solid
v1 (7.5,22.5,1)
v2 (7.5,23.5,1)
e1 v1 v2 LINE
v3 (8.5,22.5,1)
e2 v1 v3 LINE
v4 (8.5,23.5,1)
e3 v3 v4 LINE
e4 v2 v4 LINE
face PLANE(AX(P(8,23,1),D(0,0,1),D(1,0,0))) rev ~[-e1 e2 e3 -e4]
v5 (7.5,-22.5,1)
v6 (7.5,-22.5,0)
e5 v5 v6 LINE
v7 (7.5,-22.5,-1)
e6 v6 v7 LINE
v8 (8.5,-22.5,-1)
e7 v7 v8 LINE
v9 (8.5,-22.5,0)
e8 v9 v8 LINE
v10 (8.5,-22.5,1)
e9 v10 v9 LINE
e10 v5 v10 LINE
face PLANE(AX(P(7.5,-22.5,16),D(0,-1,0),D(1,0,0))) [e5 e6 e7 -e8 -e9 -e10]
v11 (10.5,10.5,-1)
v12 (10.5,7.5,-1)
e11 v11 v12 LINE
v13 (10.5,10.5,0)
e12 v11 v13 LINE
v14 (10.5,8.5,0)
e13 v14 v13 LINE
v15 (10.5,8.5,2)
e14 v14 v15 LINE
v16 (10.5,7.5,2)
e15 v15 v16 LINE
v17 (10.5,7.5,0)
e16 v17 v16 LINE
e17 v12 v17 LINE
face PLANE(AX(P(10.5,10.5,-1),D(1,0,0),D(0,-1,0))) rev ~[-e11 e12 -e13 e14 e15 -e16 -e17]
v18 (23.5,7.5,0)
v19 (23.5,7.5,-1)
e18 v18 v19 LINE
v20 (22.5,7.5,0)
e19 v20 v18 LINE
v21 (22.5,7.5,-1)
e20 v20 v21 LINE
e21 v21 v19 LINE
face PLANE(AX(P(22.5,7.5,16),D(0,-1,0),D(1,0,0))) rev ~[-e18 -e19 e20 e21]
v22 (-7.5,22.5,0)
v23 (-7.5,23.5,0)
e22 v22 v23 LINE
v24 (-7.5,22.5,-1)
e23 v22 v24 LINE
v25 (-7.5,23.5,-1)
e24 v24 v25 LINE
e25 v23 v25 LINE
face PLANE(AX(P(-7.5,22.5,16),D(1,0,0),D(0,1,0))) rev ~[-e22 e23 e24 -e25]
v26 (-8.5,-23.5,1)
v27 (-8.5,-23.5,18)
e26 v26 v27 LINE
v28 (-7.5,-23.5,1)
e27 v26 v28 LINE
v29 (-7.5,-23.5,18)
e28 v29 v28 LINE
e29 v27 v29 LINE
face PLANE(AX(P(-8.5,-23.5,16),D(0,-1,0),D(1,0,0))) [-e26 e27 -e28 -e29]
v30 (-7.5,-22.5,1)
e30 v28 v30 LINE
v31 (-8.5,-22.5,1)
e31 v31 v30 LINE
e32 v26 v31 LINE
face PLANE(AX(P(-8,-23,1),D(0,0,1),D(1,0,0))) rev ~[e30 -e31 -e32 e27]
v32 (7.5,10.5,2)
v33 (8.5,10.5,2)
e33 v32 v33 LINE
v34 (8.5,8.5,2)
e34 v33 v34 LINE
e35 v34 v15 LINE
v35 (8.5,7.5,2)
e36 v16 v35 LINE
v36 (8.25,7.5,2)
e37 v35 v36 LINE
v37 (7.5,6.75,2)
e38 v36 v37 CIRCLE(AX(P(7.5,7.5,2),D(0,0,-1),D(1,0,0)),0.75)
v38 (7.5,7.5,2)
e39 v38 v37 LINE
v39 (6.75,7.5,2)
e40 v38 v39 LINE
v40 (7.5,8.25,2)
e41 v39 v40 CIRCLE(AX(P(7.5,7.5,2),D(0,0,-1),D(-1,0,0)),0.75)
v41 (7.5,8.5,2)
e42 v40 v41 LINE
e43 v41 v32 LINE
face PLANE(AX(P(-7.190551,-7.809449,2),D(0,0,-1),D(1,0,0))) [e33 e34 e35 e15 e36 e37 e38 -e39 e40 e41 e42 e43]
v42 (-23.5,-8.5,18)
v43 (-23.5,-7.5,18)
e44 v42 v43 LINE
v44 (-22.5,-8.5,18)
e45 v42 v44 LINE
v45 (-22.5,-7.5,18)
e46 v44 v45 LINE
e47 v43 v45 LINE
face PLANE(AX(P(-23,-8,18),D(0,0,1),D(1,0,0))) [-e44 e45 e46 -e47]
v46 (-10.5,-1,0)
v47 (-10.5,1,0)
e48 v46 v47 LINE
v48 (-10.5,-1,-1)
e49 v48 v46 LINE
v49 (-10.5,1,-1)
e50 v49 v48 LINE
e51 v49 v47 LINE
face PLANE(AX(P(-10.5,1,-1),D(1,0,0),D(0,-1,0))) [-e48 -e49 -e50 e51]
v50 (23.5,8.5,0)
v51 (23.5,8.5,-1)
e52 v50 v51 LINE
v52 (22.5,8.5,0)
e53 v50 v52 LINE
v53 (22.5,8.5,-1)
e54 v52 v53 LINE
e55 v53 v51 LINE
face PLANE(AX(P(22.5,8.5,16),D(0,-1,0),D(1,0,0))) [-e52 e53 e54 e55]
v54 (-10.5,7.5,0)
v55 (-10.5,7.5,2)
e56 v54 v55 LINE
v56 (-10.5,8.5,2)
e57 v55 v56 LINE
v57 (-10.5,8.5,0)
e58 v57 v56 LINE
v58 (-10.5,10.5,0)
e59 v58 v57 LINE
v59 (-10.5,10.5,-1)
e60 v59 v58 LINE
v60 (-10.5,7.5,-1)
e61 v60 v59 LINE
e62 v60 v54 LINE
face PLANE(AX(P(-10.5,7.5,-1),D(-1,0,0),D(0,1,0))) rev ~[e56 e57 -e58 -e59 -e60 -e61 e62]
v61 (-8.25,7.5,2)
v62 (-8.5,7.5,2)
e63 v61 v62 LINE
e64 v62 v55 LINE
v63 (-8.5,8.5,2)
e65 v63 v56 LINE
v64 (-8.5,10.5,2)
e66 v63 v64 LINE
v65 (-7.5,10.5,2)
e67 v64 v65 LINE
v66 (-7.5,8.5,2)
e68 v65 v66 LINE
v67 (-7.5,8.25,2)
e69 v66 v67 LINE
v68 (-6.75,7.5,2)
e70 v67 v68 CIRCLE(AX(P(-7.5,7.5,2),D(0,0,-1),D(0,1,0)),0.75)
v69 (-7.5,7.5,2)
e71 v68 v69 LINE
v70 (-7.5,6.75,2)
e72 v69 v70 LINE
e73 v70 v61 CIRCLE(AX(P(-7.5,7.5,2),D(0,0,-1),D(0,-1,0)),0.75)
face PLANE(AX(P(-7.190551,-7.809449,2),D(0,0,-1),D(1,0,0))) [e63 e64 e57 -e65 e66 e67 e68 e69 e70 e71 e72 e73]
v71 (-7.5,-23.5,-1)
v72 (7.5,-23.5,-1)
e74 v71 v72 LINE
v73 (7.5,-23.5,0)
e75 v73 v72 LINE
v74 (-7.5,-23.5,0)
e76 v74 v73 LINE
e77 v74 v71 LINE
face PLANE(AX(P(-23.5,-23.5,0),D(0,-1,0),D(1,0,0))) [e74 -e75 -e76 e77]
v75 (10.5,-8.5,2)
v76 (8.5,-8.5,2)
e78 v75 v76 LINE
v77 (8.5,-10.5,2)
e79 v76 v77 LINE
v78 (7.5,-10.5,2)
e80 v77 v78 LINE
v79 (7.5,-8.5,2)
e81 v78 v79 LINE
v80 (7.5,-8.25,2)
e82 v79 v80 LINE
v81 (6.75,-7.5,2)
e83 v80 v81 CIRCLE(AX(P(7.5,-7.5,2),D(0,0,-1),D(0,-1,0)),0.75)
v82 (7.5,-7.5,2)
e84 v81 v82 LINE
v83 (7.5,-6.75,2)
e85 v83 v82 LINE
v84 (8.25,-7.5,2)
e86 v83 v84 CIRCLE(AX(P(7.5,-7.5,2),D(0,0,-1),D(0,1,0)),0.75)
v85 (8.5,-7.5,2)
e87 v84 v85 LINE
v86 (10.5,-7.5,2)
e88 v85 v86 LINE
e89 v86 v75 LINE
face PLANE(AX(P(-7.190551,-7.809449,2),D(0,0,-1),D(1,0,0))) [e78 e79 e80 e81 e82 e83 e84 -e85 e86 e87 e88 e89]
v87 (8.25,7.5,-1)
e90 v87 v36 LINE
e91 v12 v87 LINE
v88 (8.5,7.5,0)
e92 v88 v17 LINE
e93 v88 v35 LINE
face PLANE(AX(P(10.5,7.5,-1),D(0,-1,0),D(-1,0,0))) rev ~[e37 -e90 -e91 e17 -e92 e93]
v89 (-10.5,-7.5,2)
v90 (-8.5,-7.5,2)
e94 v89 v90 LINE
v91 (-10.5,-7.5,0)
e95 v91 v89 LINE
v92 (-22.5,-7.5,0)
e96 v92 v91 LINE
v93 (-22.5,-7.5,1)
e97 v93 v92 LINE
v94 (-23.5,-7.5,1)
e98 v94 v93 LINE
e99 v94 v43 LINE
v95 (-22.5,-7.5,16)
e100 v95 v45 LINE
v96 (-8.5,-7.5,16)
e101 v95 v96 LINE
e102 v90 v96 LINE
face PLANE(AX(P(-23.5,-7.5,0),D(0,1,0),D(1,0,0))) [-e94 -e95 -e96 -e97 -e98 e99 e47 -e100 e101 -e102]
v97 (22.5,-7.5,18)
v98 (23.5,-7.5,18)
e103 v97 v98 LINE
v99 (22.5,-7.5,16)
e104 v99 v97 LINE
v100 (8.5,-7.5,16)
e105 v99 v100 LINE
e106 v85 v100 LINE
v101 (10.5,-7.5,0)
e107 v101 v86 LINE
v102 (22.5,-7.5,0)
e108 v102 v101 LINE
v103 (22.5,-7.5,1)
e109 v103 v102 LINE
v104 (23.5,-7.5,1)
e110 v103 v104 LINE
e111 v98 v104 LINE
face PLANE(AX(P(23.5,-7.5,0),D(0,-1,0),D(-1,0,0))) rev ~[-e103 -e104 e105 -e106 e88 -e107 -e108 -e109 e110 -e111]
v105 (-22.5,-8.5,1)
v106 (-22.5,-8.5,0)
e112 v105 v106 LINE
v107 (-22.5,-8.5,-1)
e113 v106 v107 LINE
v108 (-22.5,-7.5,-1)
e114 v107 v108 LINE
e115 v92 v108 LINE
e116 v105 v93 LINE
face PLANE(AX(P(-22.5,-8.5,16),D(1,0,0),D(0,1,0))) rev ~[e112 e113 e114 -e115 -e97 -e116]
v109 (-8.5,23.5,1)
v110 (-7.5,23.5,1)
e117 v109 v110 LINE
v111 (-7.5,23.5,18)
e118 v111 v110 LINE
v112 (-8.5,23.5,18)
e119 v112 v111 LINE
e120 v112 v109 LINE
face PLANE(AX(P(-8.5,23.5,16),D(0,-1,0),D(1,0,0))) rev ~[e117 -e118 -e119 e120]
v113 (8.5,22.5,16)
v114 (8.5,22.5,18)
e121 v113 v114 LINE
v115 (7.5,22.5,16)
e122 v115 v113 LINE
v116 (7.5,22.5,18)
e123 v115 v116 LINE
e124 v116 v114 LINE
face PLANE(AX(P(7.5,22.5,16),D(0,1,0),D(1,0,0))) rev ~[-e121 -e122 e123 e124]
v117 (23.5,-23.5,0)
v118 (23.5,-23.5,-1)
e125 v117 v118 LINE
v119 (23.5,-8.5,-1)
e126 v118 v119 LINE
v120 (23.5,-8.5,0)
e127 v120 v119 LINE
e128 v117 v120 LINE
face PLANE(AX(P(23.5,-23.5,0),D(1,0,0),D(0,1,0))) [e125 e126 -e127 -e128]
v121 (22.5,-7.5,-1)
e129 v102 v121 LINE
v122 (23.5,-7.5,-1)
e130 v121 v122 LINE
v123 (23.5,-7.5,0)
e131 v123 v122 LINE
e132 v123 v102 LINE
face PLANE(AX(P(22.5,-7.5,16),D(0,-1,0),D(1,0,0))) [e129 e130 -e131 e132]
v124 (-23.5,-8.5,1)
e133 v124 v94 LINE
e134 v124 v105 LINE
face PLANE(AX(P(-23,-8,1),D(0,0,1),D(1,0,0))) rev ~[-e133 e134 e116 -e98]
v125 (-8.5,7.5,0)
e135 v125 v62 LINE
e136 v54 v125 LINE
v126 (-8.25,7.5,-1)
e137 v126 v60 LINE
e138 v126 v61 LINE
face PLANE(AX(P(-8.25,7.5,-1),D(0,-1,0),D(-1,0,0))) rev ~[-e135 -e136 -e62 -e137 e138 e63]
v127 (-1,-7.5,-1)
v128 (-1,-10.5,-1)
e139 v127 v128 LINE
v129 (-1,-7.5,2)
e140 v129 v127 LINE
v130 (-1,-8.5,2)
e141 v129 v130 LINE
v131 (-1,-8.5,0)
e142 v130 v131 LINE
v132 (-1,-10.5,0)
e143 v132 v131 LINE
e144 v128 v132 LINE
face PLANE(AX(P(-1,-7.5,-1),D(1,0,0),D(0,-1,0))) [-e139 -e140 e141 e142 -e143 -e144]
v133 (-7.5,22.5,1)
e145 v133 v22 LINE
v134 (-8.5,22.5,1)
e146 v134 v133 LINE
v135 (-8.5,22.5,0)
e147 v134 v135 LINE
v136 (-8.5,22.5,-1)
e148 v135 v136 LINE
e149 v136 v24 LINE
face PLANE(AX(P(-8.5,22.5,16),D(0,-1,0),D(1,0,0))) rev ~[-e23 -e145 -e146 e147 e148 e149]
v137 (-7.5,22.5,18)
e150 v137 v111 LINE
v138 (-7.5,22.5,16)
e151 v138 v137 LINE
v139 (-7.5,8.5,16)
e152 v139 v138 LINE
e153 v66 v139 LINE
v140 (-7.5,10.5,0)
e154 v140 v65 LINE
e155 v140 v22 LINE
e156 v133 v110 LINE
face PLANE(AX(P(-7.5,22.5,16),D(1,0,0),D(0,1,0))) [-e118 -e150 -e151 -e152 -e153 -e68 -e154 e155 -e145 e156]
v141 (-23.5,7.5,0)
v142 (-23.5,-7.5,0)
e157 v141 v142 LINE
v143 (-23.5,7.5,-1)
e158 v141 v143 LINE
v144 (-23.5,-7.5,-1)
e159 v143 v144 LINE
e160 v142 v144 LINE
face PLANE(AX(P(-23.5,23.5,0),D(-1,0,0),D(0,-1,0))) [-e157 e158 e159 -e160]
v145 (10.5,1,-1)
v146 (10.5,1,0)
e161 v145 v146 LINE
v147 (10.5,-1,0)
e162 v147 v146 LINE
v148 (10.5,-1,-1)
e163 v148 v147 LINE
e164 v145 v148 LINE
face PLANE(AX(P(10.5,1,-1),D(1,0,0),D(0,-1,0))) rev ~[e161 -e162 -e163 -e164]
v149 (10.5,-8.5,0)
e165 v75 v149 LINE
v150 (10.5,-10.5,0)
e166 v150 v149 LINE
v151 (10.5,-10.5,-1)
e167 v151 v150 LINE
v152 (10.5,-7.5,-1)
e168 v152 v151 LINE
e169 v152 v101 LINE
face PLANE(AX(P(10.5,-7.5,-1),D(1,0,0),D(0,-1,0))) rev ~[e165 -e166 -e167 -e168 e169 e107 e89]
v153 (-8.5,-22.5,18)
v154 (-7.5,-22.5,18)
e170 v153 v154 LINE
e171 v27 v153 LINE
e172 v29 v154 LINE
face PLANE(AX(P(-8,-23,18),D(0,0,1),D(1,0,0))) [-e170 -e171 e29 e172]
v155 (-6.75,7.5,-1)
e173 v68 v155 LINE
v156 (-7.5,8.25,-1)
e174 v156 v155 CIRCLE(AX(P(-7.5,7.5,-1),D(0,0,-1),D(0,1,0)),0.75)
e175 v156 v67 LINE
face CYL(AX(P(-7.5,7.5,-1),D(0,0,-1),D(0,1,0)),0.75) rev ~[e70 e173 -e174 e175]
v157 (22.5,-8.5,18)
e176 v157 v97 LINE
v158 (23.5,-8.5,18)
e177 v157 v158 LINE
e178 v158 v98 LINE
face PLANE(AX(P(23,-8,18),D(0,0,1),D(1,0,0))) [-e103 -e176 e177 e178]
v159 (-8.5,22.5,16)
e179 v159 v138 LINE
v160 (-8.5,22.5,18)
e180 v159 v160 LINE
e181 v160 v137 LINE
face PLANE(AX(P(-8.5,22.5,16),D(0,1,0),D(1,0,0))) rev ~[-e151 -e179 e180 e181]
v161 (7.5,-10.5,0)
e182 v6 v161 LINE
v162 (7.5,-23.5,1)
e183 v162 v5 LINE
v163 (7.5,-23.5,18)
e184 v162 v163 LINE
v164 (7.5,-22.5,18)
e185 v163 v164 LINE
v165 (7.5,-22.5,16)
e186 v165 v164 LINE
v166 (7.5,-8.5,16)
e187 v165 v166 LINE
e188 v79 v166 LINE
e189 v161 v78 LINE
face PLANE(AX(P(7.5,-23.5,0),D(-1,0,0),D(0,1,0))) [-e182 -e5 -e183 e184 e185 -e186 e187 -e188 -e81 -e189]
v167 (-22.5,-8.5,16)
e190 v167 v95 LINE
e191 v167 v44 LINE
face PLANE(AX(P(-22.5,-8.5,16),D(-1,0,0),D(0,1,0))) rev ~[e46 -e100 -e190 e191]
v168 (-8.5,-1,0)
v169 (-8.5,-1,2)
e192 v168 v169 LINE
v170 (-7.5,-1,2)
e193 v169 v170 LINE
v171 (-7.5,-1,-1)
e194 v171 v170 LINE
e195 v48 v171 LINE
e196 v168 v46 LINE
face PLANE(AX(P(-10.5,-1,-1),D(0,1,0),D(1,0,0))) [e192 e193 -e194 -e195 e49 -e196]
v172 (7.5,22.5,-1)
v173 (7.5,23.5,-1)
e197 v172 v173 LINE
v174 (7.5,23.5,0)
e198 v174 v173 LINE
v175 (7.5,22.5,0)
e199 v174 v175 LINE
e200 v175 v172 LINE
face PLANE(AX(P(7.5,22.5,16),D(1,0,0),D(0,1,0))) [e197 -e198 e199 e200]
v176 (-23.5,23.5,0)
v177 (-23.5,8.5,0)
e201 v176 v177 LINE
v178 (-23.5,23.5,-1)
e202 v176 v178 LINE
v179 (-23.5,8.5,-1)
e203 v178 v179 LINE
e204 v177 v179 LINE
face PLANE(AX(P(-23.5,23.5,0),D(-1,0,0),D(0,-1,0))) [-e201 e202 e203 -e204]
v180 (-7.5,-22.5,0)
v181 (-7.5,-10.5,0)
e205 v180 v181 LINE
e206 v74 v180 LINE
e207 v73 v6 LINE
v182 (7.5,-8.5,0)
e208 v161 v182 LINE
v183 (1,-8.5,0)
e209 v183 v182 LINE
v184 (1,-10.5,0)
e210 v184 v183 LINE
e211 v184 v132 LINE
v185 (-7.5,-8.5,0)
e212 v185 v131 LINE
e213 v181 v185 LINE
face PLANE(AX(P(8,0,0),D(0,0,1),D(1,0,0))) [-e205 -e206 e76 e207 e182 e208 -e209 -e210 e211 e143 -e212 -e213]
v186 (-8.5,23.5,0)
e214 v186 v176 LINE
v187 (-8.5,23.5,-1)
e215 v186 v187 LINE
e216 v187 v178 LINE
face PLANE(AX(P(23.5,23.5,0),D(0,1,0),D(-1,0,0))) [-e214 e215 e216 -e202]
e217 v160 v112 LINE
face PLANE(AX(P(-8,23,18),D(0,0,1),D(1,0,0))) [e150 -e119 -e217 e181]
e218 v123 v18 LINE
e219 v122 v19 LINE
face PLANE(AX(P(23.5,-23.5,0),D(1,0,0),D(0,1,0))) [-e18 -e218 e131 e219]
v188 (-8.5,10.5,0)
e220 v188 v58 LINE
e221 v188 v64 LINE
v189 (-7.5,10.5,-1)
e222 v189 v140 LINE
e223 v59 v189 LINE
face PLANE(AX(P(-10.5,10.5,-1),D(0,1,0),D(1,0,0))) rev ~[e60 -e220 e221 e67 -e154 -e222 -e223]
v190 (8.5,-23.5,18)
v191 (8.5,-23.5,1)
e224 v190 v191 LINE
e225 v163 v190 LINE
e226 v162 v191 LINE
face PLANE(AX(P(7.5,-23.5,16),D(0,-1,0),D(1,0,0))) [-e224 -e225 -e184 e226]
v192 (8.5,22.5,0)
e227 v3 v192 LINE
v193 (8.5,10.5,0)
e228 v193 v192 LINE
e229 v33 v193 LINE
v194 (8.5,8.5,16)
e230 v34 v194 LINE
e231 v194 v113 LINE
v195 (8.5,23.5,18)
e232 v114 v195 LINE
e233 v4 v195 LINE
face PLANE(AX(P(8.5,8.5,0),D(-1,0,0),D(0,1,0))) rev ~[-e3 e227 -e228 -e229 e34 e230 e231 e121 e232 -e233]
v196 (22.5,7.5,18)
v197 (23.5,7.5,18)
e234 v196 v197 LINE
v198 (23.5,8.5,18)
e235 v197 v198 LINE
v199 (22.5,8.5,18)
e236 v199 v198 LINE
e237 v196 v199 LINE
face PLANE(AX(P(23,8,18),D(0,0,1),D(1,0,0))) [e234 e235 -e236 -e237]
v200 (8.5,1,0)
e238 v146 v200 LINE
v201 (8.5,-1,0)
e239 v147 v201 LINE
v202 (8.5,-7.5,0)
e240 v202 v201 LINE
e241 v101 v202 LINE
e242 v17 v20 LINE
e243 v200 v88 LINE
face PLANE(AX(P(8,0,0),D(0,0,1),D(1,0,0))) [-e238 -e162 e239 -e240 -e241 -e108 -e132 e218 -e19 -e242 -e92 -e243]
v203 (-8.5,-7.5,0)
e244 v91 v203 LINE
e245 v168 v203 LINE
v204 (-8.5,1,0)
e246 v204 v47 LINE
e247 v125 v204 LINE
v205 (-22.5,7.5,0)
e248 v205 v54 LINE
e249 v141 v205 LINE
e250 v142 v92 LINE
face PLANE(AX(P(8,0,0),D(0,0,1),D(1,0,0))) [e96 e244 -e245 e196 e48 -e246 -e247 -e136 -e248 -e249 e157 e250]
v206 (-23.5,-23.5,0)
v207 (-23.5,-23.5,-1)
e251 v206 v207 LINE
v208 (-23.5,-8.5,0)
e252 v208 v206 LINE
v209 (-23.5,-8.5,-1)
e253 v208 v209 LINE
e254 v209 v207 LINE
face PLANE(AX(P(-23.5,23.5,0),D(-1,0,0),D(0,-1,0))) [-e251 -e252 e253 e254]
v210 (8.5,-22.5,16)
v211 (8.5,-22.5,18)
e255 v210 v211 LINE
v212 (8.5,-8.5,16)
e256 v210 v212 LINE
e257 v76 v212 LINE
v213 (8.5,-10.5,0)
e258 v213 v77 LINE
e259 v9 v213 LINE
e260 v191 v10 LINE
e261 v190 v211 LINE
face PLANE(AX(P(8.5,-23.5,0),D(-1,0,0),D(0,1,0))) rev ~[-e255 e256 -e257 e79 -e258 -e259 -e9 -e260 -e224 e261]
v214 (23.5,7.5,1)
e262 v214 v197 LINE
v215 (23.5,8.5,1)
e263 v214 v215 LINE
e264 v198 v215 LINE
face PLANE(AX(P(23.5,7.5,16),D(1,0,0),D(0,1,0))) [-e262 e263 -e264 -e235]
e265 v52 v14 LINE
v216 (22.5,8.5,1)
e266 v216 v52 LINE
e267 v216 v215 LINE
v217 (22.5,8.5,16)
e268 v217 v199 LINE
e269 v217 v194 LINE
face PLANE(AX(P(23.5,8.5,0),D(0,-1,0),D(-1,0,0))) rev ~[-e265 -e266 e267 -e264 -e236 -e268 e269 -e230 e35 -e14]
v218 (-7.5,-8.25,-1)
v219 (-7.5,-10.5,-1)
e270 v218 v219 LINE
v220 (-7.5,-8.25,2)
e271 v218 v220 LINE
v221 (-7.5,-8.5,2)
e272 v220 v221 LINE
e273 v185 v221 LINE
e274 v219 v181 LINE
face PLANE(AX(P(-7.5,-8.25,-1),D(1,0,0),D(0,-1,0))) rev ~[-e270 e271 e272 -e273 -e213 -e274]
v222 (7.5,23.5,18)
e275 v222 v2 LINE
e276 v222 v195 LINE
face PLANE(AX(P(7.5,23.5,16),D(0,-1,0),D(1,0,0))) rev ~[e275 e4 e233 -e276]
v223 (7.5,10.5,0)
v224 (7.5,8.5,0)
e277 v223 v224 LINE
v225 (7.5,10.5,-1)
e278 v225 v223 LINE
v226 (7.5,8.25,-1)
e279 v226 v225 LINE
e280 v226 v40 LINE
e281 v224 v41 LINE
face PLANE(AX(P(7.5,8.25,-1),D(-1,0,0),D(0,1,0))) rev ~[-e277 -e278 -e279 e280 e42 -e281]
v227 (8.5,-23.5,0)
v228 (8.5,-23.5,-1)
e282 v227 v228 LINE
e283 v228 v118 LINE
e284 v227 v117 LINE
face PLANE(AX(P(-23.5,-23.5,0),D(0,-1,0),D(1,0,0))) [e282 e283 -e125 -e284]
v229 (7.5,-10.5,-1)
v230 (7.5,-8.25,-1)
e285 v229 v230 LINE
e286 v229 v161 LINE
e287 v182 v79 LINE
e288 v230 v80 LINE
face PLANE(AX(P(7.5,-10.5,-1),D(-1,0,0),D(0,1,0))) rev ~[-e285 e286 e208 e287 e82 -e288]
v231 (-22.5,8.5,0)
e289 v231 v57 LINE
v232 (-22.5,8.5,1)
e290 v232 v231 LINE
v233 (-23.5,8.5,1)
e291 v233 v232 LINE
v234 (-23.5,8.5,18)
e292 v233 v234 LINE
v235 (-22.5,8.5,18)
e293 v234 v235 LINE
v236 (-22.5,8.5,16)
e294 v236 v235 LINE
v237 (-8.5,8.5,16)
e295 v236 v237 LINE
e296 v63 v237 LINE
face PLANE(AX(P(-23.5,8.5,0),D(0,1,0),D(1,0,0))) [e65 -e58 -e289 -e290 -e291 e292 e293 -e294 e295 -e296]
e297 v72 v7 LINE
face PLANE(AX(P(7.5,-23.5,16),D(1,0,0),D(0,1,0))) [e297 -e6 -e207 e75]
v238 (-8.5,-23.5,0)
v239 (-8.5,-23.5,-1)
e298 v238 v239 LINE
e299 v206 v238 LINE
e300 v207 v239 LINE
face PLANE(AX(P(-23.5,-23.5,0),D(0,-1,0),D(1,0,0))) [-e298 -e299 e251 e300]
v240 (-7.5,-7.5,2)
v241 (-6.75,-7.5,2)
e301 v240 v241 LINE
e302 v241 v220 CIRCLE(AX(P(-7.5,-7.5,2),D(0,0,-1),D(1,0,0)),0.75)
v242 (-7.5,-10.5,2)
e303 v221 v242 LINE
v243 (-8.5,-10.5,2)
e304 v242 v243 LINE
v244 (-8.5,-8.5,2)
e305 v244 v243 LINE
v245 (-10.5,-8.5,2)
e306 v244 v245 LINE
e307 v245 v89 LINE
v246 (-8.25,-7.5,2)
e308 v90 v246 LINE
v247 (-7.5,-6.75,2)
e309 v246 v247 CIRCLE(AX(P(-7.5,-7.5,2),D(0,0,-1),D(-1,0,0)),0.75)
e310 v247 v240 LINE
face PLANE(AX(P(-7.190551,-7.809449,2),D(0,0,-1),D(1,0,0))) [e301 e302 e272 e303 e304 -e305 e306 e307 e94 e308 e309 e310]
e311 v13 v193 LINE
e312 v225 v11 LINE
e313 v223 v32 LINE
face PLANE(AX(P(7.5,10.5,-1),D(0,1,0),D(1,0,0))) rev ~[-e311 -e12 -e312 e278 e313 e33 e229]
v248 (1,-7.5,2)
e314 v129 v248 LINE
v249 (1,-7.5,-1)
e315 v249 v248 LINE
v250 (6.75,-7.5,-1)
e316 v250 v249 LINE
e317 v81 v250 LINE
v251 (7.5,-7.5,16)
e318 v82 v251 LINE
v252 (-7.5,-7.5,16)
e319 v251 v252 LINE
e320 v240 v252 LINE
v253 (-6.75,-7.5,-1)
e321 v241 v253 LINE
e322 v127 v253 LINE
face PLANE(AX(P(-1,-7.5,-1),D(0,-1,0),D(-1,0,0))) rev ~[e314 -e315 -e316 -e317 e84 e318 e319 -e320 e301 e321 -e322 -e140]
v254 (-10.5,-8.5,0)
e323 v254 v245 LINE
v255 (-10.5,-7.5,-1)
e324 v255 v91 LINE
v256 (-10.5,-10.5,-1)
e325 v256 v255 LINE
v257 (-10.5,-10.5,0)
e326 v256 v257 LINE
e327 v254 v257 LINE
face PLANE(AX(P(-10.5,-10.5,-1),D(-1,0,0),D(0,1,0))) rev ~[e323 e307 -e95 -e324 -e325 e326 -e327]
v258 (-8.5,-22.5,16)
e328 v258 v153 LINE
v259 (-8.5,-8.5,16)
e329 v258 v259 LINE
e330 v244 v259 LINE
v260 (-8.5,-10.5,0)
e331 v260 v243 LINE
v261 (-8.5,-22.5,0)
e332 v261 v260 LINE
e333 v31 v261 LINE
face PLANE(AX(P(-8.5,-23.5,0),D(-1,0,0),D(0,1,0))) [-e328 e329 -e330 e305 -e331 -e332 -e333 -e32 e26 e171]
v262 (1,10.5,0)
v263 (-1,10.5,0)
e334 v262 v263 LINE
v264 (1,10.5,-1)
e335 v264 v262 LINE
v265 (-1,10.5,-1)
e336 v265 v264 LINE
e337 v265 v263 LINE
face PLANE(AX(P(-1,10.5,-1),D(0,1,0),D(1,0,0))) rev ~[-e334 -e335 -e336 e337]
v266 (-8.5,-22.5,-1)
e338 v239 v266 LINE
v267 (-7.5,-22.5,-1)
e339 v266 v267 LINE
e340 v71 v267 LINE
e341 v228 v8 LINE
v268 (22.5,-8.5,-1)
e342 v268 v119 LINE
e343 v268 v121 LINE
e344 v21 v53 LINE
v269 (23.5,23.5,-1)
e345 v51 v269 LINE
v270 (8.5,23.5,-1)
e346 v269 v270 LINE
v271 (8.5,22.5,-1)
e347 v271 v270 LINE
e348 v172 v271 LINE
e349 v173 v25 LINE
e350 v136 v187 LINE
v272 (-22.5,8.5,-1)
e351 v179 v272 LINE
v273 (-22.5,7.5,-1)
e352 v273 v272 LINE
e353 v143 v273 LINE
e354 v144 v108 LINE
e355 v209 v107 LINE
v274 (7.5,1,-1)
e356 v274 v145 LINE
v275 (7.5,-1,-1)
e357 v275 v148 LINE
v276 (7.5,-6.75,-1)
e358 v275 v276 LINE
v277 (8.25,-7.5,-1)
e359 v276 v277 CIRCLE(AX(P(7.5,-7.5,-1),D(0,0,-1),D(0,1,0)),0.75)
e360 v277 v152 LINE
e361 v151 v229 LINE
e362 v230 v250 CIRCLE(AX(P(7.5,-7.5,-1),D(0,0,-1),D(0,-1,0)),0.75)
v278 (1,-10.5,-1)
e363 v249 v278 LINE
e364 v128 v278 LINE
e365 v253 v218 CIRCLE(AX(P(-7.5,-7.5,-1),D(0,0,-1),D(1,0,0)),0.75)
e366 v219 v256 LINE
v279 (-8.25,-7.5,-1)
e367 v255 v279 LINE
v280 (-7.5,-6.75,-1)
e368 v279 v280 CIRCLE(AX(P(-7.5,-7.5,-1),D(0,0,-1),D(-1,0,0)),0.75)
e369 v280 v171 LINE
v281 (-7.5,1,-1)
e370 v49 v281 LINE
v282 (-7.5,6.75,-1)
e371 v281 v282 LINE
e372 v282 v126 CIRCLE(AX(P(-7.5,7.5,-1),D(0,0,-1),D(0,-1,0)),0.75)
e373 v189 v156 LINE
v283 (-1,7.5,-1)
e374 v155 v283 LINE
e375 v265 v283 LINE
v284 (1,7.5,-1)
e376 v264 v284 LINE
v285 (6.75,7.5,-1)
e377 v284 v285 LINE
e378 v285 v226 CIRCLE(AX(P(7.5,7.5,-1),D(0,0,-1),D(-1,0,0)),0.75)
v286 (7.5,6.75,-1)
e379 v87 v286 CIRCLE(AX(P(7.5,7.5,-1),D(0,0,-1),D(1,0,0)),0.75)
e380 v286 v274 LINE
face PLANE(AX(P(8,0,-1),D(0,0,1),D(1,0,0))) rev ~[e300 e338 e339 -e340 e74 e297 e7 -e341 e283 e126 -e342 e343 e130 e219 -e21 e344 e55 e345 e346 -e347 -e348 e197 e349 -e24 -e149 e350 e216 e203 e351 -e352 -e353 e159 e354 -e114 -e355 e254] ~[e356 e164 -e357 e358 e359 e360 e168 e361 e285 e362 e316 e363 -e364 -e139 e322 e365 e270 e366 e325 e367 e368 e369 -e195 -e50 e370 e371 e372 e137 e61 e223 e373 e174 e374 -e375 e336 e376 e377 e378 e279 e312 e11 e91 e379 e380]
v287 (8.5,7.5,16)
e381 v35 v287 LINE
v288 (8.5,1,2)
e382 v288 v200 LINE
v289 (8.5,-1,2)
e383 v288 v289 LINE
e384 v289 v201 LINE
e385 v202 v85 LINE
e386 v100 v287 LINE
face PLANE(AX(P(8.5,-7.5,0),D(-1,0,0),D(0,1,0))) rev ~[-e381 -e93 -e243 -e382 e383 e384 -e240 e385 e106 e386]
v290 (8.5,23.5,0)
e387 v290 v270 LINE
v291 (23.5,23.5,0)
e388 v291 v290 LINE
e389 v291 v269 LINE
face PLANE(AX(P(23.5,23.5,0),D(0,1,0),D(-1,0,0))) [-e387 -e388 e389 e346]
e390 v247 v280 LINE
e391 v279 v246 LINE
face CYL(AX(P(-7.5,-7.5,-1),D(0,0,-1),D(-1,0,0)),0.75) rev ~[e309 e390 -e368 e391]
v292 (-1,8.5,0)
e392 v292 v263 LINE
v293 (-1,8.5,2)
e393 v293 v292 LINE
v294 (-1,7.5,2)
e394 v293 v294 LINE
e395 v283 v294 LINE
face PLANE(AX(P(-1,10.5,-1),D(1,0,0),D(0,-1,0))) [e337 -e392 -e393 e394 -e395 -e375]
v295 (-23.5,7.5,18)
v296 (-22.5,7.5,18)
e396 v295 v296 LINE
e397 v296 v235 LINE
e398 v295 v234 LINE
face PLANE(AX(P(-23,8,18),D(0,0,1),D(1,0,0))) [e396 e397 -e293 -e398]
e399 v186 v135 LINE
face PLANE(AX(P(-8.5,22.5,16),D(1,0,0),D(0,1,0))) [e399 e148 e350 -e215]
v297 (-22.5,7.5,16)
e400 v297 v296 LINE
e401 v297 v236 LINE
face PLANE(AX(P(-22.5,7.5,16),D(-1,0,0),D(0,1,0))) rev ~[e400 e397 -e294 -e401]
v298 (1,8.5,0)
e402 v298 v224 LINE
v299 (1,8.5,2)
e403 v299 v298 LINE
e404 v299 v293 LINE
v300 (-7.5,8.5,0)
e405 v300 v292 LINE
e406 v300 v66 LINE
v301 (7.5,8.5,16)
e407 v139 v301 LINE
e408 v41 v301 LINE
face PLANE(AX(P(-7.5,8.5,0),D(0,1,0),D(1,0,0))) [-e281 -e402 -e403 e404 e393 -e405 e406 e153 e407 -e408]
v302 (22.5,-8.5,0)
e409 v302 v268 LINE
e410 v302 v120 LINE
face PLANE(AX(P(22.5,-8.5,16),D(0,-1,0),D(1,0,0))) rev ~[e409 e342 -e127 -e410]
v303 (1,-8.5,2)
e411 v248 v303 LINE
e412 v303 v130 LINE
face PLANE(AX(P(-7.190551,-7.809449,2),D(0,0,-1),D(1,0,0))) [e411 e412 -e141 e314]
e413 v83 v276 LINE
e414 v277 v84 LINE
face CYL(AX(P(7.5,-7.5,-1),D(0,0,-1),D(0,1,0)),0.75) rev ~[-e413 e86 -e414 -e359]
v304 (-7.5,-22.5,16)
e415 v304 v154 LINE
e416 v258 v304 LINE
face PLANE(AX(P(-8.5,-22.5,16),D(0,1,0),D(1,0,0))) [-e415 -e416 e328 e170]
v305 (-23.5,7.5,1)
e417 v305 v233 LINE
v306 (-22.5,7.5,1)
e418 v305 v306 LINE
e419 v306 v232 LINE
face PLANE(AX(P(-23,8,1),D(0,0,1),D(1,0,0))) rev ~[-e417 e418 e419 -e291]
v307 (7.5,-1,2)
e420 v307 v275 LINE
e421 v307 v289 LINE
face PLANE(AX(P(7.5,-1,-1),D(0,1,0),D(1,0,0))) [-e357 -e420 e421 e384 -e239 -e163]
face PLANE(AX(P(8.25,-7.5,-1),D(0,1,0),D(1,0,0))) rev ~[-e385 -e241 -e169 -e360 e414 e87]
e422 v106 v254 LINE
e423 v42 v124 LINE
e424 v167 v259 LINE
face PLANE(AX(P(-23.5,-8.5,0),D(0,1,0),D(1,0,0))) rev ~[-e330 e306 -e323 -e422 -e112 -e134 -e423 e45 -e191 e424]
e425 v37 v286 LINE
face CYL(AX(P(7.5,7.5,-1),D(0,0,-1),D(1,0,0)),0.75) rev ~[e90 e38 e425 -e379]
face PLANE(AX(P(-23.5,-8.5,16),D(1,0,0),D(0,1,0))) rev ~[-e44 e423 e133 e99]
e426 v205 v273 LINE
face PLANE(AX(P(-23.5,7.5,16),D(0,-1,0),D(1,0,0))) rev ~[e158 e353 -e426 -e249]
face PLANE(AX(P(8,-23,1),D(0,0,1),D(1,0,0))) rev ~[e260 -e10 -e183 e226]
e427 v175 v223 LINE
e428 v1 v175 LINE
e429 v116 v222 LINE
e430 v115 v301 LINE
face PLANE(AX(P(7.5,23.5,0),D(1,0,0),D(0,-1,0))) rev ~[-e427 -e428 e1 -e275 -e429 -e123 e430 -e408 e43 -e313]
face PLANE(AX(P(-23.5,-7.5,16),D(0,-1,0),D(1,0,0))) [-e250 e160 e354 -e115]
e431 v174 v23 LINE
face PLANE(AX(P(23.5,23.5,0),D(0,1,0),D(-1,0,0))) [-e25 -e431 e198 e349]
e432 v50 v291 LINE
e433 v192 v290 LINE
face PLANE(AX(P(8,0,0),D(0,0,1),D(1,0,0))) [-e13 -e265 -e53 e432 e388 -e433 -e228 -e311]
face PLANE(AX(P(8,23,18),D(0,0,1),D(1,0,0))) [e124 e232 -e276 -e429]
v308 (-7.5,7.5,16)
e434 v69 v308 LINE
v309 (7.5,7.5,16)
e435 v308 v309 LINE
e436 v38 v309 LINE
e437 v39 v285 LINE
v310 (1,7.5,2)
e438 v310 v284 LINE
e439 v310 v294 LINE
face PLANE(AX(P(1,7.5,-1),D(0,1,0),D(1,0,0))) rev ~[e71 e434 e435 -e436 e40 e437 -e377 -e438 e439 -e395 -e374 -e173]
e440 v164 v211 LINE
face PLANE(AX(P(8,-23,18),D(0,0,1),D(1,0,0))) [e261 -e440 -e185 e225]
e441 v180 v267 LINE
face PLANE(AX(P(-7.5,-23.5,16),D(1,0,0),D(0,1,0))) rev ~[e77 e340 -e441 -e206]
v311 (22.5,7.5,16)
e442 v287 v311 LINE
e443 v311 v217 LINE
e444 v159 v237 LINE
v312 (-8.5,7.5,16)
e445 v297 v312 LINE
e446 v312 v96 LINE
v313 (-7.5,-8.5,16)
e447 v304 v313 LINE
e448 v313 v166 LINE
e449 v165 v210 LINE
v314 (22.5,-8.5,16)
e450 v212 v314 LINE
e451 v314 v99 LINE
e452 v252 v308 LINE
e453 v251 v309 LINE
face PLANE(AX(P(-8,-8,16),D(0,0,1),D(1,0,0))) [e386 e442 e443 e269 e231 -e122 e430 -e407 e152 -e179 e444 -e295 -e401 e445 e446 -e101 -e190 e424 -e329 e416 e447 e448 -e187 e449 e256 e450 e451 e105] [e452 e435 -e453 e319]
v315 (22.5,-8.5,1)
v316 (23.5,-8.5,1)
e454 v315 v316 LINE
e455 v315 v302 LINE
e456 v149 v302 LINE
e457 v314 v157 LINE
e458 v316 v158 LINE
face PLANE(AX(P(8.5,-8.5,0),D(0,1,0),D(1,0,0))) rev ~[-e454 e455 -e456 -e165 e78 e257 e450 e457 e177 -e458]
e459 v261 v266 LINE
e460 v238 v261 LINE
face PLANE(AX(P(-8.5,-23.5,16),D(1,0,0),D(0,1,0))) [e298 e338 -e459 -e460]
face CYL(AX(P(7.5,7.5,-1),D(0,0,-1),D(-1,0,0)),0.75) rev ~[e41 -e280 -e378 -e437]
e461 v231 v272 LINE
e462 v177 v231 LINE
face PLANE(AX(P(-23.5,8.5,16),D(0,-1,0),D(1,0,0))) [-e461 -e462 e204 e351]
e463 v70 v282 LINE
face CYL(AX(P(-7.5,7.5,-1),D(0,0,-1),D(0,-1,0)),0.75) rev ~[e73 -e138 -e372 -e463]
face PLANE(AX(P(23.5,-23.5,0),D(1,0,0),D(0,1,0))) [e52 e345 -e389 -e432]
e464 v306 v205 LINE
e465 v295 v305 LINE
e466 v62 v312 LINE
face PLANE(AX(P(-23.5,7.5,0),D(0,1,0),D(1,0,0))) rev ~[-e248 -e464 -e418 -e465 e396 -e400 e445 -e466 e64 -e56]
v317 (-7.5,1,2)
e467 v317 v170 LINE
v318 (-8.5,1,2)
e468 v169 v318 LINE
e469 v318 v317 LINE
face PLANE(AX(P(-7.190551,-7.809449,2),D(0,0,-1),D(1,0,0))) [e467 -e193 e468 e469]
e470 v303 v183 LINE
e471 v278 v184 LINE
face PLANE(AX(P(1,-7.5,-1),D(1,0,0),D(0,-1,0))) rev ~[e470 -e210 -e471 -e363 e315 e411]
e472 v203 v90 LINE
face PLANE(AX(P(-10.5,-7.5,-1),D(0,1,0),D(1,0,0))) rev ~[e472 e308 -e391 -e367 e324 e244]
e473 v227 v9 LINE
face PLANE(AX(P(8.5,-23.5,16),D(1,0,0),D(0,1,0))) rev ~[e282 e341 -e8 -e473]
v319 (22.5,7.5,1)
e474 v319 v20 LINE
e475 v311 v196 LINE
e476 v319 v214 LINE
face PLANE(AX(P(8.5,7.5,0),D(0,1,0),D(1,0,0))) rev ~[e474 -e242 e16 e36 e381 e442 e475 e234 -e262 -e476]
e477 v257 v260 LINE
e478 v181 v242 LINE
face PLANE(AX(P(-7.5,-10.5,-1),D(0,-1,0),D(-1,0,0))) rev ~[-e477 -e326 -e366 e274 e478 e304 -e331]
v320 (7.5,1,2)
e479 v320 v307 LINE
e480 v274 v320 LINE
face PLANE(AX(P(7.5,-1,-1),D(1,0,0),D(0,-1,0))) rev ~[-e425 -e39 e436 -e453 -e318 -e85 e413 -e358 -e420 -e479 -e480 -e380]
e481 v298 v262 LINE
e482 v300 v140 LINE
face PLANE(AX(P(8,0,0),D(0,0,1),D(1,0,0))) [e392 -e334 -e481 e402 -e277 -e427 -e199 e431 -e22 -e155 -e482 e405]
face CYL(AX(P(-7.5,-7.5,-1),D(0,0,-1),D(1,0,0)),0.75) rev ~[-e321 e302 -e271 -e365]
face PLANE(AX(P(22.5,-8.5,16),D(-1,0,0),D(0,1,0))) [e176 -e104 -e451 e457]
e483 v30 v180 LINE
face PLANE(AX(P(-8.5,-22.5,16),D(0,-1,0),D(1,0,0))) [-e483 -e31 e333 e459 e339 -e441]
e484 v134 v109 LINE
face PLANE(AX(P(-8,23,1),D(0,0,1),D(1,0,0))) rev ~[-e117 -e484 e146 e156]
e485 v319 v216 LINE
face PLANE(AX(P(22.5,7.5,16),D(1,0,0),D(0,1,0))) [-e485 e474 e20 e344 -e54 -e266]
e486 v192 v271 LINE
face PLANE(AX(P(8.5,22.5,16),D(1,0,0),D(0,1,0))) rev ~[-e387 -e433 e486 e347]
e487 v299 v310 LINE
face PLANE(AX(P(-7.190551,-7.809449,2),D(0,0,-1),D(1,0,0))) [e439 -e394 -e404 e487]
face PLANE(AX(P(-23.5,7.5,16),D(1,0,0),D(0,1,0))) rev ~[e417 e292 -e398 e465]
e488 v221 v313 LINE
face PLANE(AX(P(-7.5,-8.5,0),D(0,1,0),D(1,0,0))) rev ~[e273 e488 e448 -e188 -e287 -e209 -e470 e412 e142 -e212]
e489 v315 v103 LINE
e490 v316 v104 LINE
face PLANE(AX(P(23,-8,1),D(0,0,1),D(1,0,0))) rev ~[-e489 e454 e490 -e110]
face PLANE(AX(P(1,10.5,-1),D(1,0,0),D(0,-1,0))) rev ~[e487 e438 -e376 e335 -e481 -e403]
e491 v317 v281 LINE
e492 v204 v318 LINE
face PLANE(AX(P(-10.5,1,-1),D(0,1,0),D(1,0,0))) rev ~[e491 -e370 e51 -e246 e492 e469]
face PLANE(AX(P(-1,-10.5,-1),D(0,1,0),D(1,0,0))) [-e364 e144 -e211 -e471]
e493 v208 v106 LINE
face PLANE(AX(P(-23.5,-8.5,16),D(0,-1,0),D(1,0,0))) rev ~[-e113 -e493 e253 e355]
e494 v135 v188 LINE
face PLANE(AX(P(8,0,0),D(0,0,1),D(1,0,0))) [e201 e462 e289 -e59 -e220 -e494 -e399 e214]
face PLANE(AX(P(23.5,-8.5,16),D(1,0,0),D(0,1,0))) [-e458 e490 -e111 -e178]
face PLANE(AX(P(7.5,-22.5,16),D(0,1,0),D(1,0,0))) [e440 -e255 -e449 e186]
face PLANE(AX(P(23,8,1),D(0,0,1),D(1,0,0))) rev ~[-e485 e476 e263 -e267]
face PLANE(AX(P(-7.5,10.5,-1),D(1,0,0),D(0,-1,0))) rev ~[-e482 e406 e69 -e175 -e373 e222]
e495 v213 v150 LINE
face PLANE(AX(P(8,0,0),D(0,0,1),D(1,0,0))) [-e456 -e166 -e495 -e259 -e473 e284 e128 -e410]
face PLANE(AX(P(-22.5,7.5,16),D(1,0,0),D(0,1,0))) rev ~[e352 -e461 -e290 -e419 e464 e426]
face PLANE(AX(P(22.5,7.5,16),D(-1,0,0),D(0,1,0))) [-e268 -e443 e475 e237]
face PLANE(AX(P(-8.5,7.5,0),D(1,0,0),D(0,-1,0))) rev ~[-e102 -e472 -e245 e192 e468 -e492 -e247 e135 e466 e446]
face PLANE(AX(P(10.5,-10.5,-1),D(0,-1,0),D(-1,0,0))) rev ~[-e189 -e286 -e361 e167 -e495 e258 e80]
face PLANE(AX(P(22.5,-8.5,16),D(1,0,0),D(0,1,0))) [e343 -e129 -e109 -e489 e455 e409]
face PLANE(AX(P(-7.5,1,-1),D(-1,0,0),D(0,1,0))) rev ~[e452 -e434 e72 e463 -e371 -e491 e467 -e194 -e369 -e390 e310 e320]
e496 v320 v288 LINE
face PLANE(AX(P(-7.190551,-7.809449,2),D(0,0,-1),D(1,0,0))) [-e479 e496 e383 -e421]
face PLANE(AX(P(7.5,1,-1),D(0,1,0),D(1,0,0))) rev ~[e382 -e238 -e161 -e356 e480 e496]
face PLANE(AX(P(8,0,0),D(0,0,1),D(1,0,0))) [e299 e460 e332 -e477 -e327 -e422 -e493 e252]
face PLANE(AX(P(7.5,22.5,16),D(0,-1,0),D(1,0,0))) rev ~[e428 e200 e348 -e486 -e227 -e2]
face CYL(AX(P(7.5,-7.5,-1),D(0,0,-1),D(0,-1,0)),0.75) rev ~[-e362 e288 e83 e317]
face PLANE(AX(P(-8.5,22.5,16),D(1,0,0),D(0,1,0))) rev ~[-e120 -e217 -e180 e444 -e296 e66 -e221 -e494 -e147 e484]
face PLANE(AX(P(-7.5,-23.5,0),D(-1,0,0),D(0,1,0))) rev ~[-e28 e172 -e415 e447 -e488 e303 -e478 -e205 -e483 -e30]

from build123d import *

# Parameters (mm, degrees)
F0_W          = 1
F0_H          = 15
F0_W_2        = 15
F0_H_2        = 1
F1_DEPTH      = 1
F2_DEPTH      = 16
F3_W          = 2
F3_H          = 3
F3_W_2        = 3
F3_H_2        = 2
F4_DEPTH      = 3
F5_W          = 1
F5_H          = 1
F6_DEPTH      = 25
F7_DEPTH      = 2
F7_DEPTH_BACK = 15


with BuildPart() as f1:
    # F0 (on Top) → F1 (new body)
    with BuildSketch(Plane.XY):
        with Locations((8, 0)):
            Rectangle(F0_W, F0_H)
        with Locations((-16, -8)):
            Rectangle(F0_W_2, F0_H_2)
        with Locations((-16, 0)):
            Rectangle(F0_W_2, F0_H)
        with Locations((8, -16)):
            Rectangle(F0_W, F0_H)
        with Locations((0, -16)):
            Rectangle(F0_W_2, F0_H)
        with Locations((-8, -16)):
            Rectangle(F0_W, F0_H)
        with Locations((16, -16)):
            Rectangle(F0_W_2, F0_H)
        with Locations((-16, -16)):
            Rectangle(F0_W_2, F0_H)
        with Locations((16, 0)):
            Rectangle(F0_W_2, F0_H)
        with Locations((16, -8)):
            Rectangle(F0_W_2, F0_H_2)
        with Locations((0, -8)):
            Rectangle(F0_W_2, F0_H_2)
        with Locations((-8, 0)):
            Rectangle(F0_W, F0_H)
        Rectangle(F0_W_2, F0_H)
        with Locations((8, -8)):
            Rectangle(F0_W, F0_H_2)
        with Locations((-8, -8)):
            Rectangle(F0_W, F0_H_2)
        with Locations((-8, 8)):
            Rectangle(F0_W, F0_H_2)
        with Locations((-16, 8)):
            Rectangle(F0_W_2, F0_H_2)
        with Locations((8, 16)):
            Rectangle(F0_W, F0_H)
        with Locations((0, 16)):
            Rectangle(F0_W_2, F0_H)
        with Locations((-8, 16)):
            Rectangle(F0_W, F0_H)
        with Locations((16, 16)):
            Rectangle(F0_W_2, F0_H)
        with Locations((16, 8)):
            Rectangle(F0_W_2, F0_H_2)
        with Locations((-16, 16)):
            Rectangle(F0_W_2, F0_H)
        with Locations((8, 8)):
            Rectangle(F0_W, F0_H_2)
        with Locations((0, 8)):
            Rectangle(F0_W_2, F0_H_2)
    extrude(amount=-F1_DEPTH)

    # F0 (on Top) → F2 (join)
    with BuildSketch(Plane.XY):
        with Locations((-8, -8)):
            Rectangle(F0_W, F0_H_2)
        with Locations((8, -8)):
            Rectangle(F0_W, F0_H_2)
        with Locations((-8, 8)):
            Rectangle(F0_W, F0_H_2)
        with Locations((8, 8)):
            Rectangle(F0_W, F0_H_2)
        with Locations((16, 8)):
            Rectangle(F0_W_2, F0_H_2)
        with Locations((8, 16)):
            Rectangle(F0_W, F0_H)
        with Locations((-8, 16)):
            Rectangle(F0_W, F0_H)
        with Locations((0, 8)):
            Rectangle(F0_W_2, F0_H_2)
        with Locations((-16, 8)):
            Rectangle(F0_W_2, F0_H_2)
        with Locations((-8, 0)):
            Rectangle(F0_W, F0_H)
        with Locations((-16, -8)):
            Rectangle(F0_W_2, F0_H_2)
        with Locations((0, -8)):
            Rectangle(F0_W_2, F0_H_2)
        with Locations((16, -8)):
            Rectangle(F0_W_2, F0_H_2)
        with Locations((8, -16)):
            Rectangle(F0_W, F0_H)
        with Locations((-8, -16)):
            Rectangle(F0_W, F0_H)
        with Locations((8, 0)):
            Rectangle(F0_W, F0_H)
    extrude(amount=F2_DEPTH)

    # F3 (on face) → F4 (cut)
    with BuildSketch(Plane(origin=(0, 0, -1), x_dir=(1, 0, 0), z_dir=(0, 0, -1))):
        with BuildLine():
            Line((-7.5, 8.25), (-7.5, 7.5))
            Line((-7.5, 7.5), (-6.75, 7.5))
            ThreePointArc((-6.75, 7.5), (-6.9696699141, 8.0303300859), (-7.5, 8.25))
        make_face()
        with BuildLine():
            Line((-6.75, 7.5), (-7.5, 7.5))
            Line((-7.5, 7.5), (-7.5, 6.75))
            ThreePointArc((-7.5, 6.75), (-6.9696699141, 6.9696699141), (-6.75, 7.5))
        make_face()
        with BuildLine():
            Line((-7.5, 6.75), (-7.5, 7.5))
            Line((-7.5, 7.5), (-8.25, 7.5))
            ThreePointArc((-8.25, 7.5), (-8.0303300859, 6.9696699141), (-7.5, 6.75))
        make_face()
        with BuildLine():
            Line((-8.25, 7.5), (-7.5, 7.5))
            Line((-7.5, 7.5), (-7.5, 8.25))
            ThreePointArc((-7.5, 8.25), (-8.0303300859, 8.0303300859), (-8.25, 7.5))
        make_face()
        with BuildLine():
            Line((-1, 7.5), (-6.75, 7.5))
            ThreePointArc((-6.75, 7.5), (-6.9696699141, 6.9696699141), (-7.5, 6.75))
            Line((-7.5, 6.75), (-7.5, 1))
            Line((-7.5, 1), (-7.5, -1))
            Line((-7.5, -1), (-7.5, -6.75))
            ThreePointArc((-7.5, -6.75), (-6.9696699141, -6.9696699141), (-6.75, -7.5))
            Line((-6.75, -7.5), (-1, -7.5))
            Line((-1, -7.5), (1, -7.5))
            Line((1, -7.5), (6.75, -7.5))
            ThreePointArc((6.75, -7.5), (6.9696699141, -6.9696699141), (7.5, -6.75))
            Line((7.5, -6.75), (7.5, -1))
            Line((7.5, -1), (7.5, 1))
            Line((7.5, 1), (7.5, 6.75))
            ThreePointArc((7.5, 6.75), (6.9696699141, 6.9696699141), (6.75, 7.5))
            Line((6.75, 7.5), (1, 7.5))
            Line((1, 7.5), (-1, 7.5))
        make_face()
        with BuildLine():
            Line((-10.5, 7.5), (-8.25, 7.5))
            ThreePointArc((-8.25, 7.5), (-8.0303300859, 8.0303300859), (-7.5, 8.25))
            Line((-7.5, 8.25), (-7.5, 10.5))
            Line((-7.5, 10.5), (-10.5, 10.5))
            Line((-10.5, 10.5), (-10.5, 7.5))
        make_face()
        with Locations((0, 9)):
            Rectangle(F3_W, F3_H)
        with Locations((-9, 0)):
            Rectangle(F3_W_2, F3_H_2)
        with BuildLine():
            ThreePointArc((7.5, 8.25), (6.9696699141, 8.0303300859), (6.75, 7.5))
            Line((6.75, 7.5), (7.5, 7.5))
            Line((7.5, 7.5), (7.5, 8.25))
        make_face()
        with BuildLine():
            Line((7.5, 7.5), (6.75, 7.5))
            ThreePointArc((6.75, 7.5), (6.9696699141, 6.9696699141), (7.5, 6.75))
            Line((7.5, 6.75), (7.5, 7.5))
        make_face()
        with BuildLine():
            ThreePointArc((-6.75, -7.5), (-6.9696699141, -6.9696699141), (-7.5, -6.75))
            Line((-7.5, -6.75), (-7.5, -7.5))
            Line((-7.5, -7.5), (-6.75, -7.5))
        make_face()
        with BuildLine():
            Line((-7.5, -7.5), (-7.5, -6.75))
            ThreePointArc((-7.5, -6.75), (-8.0303300859, -6.9696699141), (-8.25, -7.5))
            Line((-8.25, -7.5), (-7.5, -7.5))
        make_face()
        with BuildLine():
            Line((8.25, 7.5), (7.5, 7.5))
            Line((7.5, 7.5), (7.5, 6.75))
            ThreePointArc((7.5, 6.75), (8.0303300859, 6.9696699141), (8.25, 7.5))
        make_face()
        with BuildLine():
            Line((7.5, 8.25), (7.5, 7.5))
            Line((7.5, 7.5), (8.25, 7.5))
            ThreePointArc((8.25, 7.5), (8.0303300859, 8.0303300859), (7.5, 8.25))
        make_face()
        with BuildLine():
            Line((7.5, 10.5), (7.5, 8.25))
            ThreePointArc((7.5, 8.25), (8.0303300859, 8.0303300859), (8.25, 7.5))
            Line((8.25, 7.5), (10.5, 7.5))
            Line((10.5, 7.5), (10.5, 10.5))
            Line((10.5, 10.5), (7.5, 10.5))
        make_face()
        with BuildLine():
            Line((-7.5, -8.25), (-7.5, -7.5))
            Line((-7.5, -7.5), (-8.25, -7.5))
            ThreePointArc((-8.25, -7.5), (-8.0303300859, -8.0303300859), (-7.5, -8.25))
        make_face()
        with BuildLine():
            Line((-6.75, -7.5), (-7.5, -7.5))
            Line((-7.5, -7.5), (-7.5, -8.25))
            ThreePointArc((-7.5, -8.25), (-6.9696699141, -8.0303300859), (-6.75, -7.5))
        make_face()
        with BuildLine():
            ThreePointArc((-7.5, -8.25), (-8.0303300859, -8.0303300859), (-8.25, -7.5))
            Line((-8.25, -7.5), (-10.5, -7.5))
            Line((-10.5, -7.5), (-10.5, -10.5))
            Line((-10.5, -10.5), (-7.5, -10.5))
            Line((-7.5, -10.5), (-7.5, -8.25))
        make_face()
        with Locations((9, 0)):
            Rectangle(F3_W_2, F3_H_2)
        with Locations((0, -9)):
            Rectangle(F3_W, F3_H)
        with BuildLine():
            ThreePointArc((8.25, -7.5), (8.0303300859, -6.9696699141), (7.5, -6.75))
            Line((7.5, -6.75), (7.5, -7.5))
            Line((7.5, -7.5), (8.25, -7.5))
        make_face()
        with BuildLine():
            Line((7.5, -7.5), (7.5, -6.75))
            ThreePointArc((7.5, -6.75), (6.9696699141, -6.9696699141), (6.75, -7.5))
            Line((6.75, -7.5), (7.5, -7.5))
        make_face()
        with BuildLine():
            Line((7.5, -7.5), (6.75, -7.5))
            ThreePointArc((6.75, -7.5), (6.9696699141, -8.0303300859), (7.5, -8.25))
            Line((7.5, -8.25), (7.5, -7.5))
        make_face()
        with BuildLine():
            Line((8.25, -7.5), (7.5, -7.5))
            Line((7.5, -7.5), (7.5, -8.25))
            ThreePointArc((7.5, -8.25), (8.0303300859, -8.0303300859), (8.25, -7.5))
        make_face()
        with BuildLine():
            Line((10.5, -7.5), (8.25, -7.5))
            ThreePointArc((8.25, -7.5), (8.0303300859, -8.0303300859), (7.5, -8.25))
            Line((7.5, -8.25), (7.5, -10.5))
            Line((7.5, -10.5), (10.5, -10.5))
            Line((10.5, -10.5), (10.5, -7.5))
        make_face()
    extrude(amount=-F4_DEPTH, mode=Mode.SUBTRACT)

    # F5 (on face) → F6 (cut)
    with BuildSketch(Plane.XY.offset(16)):
        with Locations((-8, 23)):
            Rectangle(F5_W, F5_H)
        with Locations((-23, 8)):
            Rectangle(F5_W, F5_H)
        with Locations((8, 23)):
            Rectangle(F5_W, F5_H)
        with Locations((23, 8)):
            Rectangle(F5_W, F5_H)
        with Locations((23, -8)):
            Rectangle(F5_W, F5_H)
        with Locations((8, -23)):
            Rectangle(F5_W, F5_H)
        with Locations((-8, -23)):
            Rectangle(F5_W, F5_H)
        with Locations((-23, -8)):
            Rectangle(F5_W, F5_H)
    extrude(amount=-F6_DEPTH, mode=Mode.SUBTRACT)

    # F5 (on face) → F7 (join, two sides)
    with BuildSketch(Plane.XY.offset(16)) as f7_sk:
        with Locations((-8, 23)):
            Rectangle(F5_W, F5_H)
        with Locations((-23, 8)):
            Rectangle(F5_W, F5_H)
        with Locations((8, 23)):
            Rectangle(F5_W, F5_H)
        with Locations((23, 8)):
            Rectangle(F5_W, F5_H)
        with Locations((23, -8)):
            Rectangle(F5_W, F5_H)
        with Locations((8, -23)):
            Rectangle(F5_W, F5_H)
        with Locations((-8, -23)):
            Rectangle(F5_W, F5_H)
        with Locations((-23, -8)):
            Rectangle(F5_W, F5_H)
    extrude(amount=F7_DEPTH)
    extrude(f7_sk.sketch, amount=-F7_DEPTH_BACK)


solid = f1.part
